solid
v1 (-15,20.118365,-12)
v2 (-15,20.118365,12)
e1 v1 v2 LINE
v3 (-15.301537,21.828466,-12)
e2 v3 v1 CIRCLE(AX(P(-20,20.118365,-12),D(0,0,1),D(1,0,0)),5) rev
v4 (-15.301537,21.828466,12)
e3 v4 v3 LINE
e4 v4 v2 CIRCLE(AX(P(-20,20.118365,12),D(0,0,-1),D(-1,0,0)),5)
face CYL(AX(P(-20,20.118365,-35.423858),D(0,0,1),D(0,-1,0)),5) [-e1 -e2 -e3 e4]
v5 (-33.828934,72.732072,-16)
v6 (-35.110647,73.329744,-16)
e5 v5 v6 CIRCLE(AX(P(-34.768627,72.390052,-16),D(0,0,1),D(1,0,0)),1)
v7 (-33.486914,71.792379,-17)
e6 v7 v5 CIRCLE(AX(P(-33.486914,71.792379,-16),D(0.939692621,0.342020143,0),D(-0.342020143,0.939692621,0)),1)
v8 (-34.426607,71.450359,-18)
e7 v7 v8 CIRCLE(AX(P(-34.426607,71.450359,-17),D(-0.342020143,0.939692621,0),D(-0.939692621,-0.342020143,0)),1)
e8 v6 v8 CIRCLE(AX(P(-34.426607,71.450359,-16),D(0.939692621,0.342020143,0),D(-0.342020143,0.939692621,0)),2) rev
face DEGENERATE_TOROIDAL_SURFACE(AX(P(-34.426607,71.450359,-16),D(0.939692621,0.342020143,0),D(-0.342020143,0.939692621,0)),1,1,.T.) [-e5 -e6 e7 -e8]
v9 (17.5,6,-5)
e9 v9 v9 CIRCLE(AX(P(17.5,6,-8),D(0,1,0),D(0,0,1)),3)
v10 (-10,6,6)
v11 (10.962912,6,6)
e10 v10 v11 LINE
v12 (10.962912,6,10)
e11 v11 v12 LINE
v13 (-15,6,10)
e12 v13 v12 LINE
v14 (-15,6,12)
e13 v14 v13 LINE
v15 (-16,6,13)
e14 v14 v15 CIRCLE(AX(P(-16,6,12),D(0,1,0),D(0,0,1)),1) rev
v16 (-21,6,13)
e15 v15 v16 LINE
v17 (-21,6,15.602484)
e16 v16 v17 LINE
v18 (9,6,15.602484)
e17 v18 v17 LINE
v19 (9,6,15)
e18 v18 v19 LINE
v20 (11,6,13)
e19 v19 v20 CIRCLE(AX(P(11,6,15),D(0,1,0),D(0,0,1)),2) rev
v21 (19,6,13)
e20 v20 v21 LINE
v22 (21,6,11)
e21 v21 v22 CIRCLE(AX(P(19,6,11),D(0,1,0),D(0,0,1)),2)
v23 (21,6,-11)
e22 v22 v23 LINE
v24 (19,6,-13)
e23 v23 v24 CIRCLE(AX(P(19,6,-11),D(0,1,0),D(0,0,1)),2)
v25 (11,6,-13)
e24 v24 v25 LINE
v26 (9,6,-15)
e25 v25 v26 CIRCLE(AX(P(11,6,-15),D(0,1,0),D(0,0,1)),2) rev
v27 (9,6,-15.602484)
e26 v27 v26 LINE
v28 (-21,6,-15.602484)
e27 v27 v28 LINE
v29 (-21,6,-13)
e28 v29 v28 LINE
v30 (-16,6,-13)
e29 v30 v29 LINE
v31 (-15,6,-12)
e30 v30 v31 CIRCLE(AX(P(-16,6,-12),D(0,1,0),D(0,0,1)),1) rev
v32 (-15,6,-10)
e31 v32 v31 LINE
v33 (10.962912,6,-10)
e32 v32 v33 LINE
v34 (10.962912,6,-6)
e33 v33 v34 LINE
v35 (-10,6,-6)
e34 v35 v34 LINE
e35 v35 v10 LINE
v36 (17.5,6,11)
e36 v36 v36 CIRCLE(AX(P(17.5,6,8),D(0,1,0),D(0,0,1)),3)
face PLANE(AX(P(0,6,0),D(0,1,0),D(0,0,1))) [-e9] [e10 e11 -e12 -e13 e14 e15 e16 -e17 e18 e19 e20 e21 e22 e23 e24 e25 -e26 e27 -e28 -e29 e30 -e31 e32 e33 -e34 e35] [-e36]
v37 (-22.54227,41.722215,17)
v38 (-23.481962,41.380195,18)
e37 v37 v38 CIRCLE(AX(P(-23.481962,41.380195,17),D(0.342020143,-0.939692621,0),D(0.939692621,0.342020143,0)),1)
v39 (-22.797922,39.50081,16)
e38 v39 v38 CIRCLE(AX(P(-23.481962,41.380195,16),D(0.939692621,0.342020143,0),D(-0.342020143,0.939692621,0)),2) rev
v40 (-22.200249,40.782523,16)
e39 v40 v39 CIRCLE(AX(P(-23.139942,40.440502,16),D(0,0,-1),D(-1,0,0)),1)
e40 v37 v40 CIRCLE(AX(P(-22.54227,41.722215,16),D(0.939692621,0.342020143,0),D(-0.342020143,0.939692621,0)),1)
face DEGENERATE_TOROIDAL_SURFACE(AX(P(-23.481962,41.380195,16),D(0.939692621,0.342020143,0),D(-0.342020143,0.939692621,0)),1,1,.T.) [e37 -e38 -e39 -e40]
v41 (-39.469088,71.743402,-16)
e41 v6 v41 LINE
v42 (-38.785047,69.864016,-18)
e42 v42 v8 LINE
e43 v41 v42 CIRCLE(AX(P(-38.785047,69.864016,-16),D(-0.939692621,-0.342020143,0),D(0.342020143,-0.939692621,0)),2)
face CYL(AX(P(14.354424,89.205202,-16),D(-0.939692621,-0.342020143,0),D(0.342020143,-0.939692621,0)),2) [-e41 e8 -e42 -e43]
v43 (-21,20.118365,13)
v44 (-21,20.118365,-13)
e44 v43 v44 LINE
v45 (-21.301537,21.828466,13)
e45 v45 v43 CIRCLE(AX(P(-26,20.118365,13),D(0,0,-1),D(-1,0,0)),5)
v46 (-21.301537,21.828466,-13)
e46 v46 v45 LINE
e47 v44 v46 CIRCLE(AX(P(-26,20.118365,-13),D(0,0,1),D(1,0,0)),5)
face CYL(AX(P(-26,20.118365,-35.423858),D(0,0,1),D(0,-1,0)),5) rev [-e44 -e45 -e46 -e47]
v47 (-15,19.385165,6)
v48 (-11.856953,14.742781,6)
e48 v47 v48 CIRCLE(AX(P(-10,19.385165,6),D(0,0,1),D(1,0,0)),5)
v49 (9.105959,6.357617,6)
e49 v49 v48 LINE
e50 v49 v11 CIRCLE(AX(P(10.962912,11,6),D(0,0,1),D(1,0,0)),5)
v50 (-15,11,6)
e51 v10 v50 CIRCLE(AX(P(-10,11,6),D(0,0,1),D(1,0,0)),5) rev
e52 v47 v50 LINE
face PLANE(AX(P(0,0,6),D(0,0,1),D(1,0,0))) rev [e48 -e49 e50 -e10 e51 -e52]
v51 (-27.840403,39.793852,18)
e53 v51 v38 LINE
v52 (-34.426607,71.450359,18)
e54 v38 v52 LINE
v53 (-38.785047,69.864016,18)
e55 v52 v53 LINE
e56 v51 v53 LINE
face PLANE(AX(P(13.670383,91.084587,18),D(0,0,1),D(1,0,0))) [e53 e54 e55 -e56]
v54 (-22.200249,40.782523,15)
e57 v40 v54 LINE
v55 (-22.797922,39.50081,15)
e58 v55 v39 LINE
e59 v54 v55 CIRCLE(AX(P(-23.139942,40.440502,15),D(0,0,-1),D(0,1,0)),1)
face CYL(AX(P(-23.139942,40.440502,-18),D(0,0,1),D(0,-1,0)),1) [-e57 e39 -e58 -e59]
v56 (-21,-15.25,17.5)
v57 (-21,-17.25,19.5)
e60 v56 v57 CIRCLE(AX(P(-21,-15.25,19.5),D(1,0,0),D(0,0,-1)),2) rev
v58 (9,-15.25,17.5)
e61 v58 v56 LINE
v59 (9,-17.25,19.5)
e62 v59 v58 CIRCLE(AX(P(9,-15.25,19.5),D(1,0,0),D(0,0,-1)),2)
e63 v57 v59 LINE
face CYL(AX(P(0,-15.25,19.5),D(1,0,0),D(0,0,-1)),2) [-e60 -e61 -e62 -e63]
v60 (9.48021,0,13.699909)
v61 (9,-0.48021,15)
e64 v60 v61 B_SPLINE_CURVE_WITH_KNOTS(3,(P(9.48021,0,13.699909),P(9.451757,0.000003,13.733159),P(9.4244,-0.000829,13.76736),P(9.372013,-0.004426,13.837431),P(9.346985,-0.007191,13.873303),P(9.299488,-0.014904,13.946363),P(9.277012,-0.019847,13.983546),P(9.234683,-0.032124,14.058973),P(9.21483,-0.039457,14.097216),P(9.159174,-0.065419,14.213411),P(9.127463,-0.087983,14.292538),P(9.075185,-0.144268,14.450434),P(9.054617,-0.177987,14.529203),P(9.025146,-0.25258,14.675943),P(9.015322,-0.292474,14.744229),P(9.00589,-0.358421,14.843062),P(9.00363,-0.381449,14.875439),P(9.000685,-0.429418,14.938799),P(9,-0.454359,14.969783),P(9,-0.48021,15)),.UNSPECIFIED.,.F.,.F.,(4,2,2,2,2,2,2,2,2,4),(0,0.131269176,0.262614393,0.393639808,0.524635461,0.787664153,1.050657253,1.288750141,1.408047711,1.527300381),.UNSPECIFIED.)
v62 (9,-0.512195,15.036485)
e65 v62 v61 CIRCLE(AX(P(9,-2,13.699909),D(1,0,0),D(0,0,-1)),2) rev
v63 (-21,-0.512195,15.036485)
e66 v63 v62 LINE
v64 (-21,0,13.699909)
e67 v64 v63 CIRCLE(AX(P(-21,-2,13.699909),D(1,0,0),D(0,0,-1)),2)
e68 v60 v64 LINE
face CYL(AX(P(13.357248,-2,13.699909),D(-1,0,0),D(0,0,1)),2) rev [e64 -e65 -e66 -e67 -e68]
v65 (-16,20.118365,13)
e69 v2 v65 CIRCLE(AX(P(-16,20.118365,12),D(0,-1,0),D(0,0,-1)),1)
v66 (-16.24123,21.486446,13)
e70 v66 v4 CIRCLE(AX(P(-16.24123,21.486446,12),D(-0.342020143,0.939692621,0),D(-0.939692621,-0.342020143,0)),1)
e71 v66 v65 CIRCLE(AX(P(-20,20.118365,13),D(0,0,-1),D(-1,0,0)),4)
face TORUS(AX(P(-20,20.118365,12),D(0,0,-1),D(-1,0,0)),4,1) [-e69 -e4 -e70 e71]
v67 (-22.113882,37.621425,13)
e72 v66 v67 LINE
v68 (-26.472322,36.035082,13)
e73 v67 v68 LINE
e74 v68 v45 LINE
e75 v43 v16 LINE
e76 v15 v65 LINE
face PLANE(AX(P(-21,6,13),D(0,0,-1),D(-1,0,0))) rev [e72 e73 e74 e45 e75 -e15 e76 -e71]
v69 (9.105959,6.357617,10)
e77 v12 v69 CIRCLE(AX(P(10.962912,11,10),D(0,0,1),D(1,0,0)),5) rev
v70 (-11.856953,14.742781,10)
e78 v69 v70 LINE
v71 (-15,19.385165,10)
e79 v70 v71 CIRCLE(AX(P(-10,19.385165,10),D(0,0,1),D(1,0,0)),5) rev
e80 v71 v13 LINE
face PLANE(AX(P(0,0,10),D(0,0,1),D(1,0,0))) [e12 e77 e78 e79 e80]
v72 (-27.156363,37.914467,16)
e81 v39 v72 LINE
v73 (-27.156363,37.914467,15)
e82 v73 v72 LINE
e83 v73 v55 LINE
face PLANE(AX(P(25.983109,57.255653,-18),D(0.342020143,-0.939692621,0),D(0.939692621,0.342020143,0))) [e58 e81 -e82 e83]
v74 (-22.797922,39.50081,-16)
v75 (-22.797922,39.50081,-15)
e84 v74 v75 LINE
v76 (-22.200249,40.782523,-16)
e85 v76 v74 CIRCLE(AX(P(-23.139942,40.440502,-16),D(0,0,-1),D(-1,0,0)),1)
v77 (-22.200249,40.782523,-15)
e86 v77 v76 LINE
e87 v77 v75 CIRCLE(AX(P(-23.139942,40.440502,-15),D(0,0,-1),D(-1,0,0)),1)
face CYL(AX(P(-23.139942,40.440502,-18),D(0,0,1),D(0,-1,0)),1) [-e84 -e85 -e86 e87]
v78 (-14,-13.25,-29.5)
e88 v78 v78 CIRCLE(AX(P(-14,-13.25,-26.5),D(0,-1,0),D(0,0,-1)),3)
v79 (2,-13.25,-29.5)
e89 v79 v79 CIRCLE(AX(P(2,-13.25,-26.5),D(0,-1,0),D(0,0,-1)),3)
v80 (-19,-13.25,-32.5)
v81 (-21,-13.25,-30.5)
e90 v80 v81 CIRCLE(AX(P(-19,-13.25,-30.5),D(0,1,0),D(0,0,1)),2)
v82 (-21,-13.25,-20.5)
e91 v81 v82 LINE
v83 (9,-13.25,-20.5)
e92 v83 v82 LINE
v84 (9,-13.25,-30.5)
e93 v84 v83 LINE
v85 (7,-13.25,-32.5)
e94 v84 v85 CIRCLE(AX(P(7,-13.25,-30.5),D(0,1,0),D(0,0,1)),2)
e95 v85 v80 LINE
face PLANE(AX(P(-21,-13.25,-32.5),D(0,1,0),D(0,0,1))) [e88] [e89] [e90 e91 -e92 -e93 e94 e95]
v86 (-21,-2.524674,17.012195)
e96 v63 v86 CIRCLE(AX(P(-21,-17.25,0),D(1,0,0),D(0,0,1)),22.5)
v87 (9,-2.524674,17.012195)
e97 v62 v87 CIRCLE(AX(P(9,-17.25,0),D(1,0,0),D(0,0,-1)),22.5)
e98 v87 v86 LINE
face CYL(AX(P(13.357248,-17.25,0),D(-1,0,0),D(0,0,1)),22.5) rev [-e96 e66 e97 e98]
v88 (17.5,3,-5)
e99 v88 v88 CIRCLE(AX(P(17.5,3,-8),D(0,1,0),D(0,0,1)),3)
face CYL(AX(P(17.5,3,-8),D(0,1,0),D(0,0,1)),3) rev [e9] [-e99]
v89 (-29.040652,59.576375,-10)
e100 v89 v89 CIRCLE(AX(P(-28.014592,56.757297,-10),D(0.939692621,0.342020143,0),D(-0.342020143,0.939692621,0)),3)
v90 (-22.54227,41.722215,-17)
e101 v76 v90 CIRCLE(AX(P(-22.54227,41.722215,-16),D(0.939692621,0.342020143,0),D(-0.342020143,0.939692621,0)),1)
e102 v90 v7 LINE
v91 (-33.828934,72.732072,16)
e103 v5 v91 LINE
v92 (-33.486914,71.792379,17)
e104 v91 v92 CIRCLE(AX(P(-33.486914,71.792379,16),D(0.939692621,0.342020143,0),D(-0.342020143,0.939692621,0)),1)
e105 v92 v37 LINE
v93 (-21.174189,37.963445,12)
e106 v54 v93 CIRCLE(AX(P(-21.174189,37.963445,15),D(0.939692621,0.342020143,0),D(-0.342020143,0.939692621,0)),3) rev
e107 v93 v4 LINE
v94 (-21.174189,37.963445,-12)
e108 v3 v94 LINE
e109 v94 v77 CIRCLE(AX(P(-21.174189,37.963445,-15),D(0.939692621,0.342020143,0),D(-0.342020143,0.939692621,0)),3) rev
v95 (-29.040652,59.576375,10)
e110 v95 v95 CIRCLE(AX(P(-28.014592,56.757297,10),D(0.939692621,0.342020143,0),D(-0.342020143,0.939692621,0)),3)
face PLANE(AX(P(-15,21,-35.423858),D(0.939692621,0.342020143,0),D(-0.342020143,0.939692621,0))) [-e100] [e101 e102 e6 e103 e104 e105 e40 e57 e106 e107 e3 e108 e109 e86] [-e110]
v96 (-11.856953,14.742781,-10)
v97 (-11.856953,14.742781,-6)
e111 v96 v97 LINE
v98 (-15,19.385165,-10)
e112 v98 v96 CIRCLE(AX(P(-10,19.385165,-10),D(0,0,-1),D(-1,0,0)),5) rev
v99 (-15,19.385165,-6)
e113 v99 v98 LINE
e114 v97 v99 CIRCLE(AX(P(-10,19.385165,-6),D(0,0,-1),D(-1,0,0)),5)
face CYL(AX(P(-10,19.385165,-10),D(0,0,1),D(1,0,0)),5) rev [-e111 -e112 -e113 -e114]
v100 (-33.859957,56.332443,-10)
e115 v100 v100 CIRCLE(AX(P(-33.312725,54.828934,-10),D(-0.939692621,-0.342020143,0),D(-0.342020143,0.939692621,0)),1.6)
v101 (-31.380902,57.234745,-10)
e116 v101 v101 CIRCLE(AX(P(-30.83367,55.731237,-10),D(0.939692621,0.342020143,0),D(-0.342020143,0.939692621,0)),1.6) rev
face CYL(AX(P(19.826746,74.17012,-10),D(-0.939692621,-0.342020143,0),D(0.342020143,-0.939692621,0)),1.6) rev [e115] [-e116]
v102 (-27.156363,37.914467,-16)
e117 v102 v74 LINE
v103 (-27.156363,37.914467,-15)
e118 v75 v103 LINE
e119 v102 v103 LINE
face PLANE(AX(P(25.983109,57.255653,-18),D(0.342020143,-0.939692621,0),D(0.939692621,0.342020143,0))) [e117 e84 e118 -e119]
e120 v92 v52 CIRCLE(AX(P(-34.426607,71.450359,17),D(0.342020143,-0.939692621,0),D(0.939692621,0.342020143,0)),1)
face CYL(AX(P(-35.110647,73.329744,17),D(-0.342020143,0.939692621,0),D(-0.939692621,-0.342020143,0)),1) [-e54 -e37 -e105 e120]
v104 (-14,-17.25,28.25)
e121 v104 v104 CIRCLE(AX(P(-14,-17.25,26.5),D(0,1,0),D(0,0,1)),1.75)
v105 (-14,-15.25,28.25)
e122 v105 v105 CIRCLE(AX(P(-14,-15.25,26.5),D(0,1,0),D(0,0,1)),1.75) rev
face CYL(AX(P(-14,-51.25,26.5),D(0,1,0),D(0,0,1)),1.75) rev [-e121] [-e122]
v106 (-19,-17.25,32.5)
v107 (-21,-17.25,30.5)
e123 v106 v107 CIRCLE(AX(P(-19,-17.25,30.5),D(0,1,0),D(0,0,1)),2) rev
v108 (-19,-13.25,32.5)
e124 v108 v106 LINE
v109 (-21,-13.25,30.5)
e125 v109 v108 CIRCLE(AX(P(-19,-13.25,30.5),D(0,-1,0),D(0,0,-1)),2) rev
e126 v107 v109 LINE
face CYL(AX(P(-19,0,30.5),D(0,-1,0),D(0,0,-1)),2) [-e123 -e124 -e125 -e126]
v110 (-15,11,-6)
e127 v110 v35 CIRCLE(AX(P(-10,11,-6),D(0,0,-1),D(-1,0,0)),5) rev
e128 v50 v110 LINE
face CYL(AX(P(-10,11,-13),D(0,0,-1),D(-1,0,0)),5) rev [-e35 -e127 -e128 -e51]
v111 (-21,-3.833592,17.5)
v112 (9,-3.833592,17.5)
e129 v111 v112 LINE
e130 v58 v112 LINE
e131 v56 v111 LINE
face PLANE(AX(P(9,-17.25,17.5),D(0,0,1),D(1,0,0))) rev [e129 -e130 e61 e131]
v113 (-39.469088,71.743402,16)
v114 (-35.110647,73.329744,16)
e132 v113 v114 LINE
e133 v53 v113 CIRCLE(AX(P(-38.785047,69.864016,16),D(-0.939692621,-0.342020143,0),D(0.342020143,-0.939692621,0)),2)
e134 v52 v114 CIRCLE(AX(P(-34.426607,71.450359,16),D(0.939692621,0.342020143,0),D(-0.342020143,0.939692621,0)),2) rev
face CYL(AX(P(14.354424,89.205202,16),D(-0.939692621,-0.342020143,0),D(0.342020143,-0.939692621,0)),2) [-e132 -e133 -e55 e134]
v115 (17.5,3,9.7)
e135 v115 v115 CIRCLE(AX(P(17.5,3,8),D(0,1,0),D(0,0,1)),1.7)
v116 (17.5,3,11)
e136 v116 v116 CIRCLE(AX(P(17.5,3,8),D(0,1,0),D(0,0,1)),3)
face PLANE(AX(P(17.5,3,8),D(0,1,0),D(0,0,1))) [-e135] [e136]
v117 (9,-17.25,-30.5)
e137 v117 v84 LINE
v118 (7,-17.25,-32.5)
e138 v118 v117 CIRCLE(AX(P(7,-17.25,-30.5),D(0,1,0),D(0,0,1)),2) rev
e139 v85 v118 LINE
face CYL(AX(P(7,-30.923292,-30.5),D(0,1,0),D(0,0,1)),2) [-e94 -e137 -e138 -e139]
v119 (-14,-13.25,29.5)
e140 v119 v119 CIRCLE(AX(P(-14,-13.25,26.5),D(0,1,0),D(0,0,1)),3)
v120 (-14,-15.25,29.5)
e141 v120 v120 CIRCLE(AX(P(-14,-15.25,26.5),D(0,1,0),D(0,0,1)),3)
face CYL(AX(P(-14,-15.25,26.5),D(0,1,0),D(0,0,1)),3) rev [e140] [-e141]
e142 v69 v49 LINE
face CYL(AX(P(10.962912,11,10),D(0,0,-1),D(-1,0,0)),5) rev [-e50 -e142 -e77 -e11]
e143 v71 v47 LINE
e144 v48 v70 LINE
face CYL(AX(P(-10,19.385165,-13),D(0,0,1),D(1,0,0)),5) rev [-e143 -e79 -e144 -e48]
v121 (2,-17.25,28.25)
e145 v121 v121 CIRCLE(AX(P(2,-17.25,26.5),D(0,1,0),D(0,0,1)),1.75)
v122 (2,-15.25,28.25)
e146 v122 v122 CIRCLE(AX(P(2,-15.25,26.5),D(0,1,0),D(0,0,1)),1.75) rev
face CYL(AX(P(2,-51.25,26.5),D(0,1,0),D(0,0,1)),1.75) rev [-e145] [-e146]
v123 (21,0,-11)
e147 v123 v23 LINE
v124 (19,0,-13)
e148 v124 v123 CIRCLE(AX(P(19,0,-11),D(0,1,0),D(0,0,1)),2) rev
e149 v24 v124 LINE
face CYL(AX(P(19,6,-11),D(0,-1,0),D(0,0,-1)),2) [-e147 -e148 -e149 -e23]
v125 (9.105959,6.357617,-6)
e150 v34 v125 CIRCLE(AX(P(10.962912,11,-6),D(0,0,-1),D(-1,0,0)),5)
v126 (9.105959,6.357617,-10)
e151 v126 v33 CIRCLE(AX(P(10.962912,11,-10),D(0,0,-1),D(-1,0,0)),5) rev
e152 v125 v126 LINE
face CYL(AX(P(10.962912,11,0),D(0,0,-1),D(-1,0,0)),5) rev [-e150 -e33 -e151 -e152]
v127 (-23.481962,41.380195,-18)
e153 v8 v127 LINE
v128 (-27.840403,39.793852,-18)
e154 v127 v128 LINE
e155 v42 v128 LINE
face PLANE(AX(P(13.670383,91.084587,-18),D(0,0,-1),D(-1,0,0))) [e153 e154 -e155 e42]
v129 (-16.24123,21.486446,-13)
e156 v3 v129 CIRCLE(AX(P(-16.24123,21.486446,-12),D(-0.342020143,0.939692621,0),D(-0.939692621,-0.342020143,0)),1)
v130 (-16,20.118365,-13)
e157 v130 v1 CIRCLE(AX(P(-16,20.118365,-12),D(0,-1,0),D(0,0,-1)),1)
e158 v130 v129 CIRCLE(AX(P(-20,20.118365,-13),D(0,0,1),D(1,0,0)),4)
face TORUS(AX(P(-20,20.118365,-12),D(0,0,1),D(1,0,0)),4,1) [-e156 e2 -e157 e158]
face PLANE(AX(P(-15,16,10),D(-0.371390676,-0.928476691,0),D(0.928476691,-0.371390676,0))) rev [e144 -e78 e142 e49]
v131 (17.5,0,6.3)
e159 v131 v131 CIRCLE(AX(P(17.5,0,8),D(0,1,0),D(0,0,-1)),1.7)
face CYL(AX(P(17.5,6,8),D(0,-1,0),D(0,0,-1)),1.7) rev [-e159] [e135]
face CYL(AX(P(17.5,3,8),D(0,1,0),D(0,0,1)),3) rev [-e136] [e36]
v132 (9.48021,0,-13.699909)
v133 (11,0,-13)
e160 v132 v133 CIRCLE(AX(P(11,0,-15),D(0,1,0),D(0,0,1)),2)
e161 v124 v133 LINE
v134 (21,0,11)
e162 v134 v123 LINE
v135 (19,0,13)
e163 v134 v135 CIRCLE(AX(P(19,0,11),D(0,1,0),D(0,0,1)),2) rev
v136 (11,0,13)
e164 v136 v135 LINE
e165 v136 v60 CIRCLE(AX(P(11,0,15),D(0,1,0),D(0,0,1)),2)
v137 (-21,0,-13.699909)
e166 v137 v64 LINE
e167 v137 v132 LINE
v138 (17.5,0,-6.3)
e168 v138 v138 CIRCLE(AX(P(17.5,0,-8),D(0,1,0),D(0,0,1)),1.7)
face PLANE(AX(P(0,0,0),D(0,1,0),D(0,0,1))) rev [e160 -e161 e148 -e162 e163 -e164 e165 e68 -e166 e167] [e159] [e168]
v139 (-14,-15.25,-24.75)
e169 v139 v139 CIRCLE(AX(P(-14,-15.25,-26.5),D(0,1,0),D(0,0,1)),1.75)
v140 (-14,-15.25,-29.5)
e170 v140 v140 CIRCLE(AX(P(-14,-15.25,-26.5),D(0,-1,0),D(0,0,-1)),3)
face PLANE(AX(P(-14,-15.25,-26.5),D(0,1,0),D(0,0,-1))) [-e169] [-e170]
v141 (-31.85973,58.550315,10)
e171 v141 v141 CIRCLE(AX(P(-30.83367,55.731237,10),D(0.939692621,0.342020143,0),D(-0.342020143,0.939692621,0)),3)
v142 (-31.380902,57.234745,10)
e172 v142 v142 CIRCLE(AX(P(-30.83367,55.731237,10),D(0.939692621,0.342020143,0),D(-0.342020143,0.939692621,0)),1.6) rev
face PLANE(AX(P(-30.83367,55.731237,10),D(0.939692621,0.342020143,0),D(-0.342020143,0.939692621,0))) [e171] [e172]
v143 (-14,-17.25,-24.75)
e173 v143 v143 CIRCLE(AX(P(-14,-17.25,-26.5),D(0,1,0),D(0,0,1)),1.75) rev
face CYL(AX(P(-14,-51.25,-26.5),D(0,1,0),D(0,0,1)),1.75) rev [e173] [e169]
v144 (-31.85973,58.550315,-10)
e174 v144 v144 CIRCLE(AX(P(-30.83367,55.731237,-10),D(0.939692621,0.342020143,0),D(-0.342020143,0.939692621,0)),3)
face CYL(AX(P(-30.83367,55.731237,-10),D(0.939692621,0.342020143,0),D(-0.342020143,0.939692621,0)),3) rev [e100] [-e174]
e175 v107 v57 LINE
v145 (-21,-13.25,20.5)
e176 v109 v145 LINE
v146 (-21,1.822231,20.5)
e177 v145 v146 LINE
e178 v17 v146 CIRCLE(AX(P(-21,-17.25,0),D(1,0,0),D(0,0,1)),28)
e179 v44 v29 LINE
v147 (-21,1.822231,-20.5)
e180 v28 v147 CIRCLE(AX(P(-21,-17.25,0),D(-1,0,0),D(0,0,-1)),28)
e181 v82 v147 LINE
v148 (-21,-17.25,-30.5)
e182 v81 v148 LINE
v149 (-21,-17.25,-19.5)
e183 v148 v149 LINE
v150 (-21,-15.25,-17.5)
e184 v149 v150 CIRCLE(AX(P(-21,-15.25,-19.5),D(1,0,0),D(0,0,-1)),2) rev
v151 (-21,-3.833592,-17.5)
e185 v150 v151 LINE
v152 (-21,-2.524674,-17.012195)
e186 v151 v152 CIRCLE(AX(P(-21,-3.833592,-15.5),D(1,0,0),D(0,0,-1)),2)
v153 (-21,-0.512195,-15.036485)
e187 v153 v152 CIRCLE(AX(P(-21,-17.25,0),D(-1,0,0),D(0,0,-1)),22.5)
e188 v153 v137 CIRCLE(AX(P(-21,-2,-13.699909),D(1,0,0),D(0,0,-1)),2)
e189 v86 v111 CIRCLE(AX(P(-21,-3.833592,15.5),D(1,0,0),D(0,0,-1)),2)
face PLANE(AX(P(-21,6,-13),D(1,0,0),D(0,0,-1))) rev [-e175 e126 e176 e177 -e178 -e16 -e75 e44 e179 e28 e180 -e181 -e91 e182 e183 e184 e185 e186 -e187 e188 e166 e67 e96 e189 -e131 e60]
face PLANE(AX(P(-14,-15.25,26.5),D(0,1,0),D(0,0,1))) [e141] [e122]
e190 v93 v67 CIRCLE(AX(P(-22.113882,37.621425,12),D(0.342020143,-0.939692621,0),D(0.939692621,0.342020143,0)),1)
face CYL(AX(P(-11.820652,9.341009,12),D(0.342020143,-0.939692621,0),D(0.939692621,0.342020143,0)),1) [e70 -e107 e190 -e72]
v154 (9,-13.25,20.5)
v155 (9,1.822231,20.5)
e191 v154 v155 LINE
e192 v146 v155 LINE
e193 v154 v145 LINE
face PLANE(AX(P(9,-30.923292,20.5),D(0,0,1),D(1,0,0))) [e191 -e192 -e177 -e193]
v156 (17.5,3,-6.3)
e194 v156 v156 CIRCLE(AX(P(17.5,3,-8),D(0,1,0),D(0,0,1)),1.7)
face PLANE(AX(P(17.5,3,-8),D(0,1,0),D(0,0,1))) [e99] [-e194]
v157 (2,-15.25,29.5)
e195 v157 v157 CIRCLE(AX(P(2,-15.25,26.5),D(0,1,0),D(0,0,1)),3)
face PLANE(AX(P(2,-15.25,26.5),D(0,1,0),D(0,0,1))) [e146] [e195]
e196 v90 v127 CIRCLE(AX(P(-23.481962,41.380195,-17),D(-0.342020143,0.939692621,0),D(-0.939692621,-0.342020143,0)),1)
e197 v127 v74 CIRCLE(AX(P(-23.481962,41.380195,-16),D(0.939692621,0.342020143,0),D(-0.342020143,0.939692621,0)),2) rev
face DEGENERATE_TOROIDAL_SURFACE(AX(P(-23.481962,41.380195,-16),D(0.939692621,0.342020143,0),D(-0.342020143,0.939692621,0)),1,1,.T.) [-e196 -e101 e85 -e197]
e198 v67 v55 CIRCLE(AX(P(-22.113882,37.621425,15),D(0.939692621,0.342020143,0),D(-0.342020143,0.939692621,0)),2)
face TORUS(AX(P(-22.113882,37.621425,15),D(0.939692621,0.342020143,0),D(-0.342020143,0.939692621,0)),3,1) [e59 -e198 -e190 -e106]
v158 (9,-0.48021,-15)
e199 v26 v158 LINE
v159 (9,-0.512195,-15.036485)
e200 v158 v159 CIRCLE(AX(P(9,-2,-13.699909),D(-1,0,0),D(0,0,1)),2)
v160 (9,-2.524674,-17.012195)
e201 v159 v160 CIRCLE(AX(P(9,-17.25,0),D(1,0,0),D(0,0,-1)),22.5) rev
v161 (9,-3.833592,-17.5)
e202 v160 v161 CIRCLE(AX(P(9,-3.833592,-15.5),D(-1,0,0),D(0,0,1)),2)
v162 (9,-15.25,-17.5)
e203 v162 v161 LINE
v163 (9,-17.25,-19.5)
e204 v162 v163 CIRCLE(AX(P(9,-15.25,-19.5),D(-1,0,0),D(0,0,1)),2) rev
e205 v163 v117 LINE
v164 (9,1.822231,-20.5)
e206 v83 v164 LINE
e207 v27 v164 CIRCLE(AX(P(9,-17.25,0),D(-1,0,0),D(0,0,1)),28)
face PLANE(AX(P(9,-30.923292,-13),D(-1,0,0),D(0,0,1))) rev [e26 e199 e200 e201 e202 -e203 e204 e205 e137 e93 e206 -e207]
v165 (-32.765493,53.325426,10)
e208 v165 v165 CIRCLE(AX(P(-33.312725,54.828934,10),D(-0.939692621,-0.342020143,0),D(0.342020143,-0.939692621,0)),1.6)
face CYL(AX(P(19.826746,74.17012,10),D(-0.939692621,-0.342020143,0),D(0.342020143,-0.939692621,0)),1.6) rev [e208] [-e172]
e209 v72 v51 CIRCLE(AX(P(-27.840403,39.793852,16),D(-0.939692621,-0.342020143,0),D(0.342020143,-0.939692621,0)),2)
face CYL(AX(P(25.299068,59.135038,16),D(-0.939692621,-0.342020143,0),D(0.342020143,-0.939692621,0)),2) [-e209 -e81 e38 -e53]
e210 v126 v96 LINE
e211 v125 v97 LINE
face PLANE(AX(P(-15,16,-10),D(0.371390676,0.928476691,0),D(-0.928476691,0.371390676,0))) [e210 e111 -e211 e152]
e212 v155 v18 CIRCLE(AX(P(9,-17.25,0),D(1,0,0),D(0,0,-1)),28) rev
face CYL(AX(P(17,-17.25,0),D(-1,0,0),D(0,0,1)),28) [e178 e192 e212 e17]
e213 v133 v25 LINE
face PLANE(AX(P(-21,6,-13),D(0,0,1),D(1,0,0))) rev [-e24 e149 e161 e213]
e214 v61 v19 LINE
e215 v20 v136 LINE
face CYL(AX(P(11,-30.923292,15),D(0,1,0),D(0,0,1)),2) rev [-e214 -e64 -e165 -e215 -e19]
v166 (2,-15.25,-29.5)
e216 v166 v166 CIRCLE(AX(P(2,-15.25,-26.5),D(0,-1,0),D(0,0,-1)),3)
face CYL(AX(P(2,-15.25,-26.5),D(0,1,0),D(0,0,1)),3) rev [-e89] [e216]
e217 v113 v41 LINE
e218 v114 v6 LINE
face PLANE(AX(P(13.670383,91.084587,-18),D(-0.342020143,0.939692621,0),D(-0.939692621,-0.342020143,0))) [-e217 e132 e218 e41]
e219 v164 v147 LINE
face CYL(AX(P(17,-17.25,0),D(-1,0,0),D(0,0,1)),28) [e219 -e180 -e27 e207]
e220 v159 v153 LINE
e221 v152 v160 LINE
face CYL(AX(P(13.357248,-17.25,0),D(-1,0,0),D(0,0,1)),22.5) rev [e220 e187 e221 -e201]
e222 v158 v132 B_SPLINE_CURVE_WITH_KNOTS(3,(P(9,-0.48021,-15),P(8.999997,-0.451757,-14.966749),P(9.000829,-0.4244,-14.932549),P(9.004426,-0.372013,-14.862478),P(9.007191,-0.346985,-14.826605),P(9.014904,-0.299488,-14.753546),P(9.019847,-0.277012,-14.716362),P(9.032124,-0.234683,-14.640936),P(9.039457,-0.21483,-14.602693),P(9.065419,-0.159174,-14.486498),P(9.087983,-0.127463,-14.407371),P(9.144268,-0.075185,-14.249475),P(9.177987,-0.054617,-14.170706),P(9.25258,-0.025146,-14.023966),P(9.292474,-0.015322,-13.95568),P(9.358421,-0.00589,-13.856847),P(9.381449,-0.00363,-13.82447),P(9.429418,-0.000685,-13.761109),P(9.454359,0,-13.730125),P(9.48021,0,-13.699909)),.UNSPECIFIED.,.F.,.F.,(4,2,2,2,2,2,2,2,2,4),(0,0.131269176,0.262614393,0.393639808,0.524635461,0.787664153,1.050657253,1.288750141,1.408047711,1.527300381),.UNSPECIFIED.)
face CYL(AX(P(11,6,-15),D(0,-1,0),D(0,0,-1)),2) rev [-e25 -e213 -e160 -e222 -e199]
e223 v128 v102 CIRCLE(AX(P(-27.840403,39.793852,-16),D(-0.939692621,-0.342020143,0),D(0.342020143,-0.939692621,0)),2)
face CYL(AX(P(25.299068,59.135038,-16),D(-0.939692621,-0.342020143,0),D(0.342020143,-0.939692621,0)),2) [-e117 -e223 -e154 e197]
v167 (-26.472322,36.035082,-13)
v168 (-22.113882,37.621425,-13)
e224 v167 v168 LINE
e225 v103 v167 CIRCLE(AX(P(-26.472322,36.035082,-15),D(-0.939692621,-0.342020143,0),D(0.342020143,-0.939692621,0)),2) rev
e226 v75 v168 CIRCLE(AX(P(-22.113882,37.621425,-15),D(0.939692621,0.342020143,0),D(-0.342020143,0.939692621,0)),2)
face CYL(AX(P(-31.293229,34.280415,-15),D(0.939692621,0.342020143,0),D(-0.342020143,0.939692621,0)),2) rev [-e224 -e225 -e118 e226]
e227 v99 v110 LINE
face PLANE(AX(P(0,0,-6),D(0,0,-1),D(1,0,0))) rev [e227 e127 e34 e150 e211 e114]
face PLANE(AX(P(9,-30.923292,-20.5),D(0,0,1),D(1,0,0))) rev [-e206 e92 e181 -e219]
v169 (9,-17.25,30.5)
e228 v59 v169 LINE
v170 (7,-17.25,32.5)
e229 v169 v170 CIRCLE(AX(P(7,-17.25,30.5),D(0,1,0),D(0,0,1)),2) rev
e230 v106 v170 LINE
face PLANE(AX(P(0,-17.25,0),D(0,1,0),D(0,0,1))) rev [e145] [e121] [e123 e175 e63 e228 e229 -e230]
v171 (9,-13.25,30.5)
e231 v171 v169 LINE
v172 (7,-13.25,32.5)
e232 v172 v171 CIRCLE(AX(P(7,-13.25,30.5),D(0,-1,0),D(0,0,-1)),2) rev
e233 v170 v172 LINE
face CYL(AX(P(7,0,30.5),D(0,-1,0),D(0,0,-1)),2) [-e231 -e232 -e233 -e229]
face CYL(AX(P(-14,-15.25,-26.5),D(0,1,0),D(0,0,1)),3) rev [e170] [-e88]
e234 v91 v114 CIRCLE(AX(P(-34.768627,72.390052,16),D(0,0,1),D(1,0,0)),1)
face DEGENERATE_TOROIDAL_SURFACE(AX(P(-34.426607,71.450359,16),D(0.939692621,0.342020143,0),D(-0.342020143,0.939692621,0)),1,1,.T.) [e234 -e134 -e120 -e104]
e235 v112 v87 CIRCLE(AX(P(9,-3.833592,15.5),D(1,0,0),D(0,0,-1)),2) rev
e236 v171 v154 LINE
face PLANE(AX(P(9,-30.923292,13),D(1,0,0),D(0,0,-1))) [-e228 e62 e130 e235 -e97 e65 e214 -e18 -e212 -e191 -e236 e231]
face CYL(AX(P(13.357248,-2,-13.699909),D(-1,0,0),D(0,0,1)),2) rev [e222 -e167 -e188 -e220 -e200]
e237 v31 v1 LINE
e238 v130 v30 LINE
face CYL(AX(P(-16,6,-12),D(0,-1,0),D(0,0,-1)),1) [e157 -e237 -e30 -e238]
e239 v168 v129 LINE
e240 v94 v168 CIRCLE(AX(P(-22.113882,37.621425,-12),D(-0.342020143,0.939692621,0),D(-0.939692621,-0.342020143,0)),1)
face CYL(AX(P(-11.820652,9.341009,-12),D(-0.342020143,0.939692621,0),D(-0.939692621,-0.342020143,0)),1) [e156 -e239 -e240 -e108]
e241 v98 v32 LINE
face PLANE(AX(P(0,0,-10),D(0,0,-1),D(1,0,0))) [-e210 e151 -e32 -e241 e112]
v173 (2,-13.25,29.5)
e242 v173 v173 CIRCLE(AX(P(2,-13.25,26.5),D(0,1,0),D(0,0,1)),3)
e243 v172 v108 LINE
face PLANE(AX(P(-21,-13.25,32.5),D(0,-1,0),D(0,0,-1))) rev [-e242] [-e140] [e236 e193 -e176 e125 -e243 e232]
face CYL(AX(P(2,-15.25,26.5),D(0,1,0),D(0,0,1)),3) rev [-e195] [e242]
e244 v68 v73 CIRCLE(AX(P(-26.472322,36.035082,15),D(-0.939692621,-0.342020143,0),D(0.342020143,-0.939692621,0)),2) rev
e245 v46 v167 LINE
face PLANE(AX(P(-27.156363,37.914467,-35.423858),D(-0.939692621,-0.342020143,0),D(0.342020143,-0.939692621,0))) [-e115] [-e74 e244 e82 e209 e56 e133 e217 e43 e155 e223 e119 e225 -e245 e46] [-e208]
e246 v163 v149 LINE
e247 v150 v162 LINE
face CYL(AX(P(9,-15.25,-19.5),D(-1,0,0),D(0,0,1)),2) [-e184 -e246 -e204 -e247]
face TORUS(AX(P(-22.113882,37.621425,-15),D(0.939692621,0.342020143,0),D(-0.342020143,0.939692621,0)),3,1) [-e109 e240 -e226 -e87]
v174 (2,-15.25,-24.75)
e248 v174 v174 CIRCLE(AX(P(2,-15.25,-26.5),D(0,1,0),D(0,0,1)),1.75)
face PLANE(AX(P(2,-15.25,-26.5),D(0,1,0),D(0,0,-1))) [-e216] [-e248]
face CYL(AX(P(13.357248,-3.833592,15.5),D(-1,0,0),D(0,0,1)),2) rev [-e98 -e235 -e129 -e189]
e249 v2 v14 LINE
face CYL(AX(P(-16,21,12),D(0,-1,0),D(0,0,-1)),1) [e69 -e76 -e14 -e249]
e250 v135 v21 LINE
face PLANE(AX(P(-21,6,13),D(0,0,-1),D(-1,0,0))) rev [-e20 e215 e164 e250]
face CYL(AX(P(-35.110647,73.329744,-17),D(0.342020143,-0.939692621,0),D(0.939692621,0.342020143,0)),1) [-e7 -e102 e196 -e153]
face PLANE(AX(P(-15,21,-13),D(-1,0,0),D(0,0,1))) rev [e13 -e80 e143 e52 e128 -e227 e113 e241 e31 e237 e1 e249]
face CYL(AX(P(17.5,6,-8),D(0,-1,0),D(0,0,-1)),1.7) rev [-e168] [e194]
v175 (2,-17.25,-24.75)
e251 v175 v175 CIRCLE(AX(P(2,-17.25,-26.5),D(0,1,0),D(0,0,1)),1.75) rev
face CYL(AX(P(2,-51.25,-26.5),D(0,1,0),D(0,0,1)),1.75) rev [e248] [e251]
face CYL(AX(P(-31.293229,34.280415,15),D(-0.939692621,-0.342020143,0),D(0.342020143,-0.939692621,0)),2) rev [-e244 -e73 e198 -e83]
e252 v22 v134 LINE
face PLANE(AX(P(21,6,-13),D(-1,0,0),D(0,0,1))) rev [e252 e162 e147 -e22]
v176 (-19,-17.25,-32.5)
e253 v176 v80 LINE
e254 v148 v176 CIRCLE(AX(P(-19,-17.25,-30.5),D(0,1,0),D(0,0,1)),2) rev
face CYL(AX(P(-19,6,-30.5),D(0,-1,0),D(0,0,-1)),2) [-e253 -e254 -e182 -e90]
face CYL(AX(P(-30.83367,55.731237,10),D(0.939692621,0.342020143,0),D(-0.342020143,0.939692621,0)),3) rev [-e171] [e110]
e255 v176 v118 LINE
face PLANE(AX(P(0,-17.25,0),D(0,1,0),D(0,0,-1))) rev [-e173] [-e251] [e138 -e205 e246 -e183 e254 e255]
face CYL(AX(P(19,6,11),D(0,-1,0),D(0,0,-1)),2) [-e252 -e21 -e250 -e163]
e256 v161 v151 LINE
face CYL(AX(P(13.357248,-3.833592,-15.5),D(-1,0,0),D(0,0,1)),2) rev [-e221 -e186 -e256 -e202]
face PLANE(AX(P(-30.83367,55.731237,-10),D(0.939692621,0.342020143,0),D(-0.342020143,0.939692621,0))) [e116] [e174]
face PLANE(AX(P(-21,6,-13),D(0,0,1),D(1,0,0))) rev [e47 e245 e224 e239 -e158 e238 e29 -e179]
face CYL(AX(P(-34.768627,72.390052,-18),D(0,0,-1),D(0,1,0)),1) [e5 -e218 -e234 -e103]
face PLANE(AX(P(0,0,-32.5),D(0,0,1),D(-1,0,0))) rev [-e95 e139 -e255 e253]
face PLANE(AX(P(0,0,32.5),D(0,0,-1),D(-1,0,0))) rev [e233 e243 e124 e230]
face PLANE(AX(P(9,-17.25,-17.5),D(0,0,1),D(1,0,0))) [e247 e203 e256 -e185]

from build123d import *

# Parameters (mm, degrees)
SKETCH_1_W              = 42
SKETCH_1_H              = 26
SKETCH_1_R              = 1.7
EXTRUDE_1_DEPTH         = 6
SKETCH_15_W             = 6
SKETCH_15_H             = 26
EXTRUDE_4_DEPTH         = 15
EXTRUDE_5_DEPTH         = 26
SKETCH_17_W             = 36
SKETCH_17_H             = 36
SKETCH_17_R             = 1.6
EXTRUDE_6_DEPTH         = 5.638155725
FILLET_3_R              = 2
SKETCH_18_R             = 3
CUT_EXTRUDE_4_DEPTH     = 3
SKETCH_19_R             = 3
CUT_EXTRUDE_5_DEPTH     = 3
FILLET_4_R              = 1
FILLET_6_R              = 5
EXTRUDE_7_DEPTH         = 2
FILLET_7_R              = 5
FILLET_8_R              = 5
SKETCH_21_W             = 30
SKETCH_21_H             = 7.5
EXTRUDE_8_DEPTH         = 6
SKETCH_23_W             = 30
SKETCH_23_H             = 3
EXTRUDE_9_DEPTH         = 17.25
SKETCH_24_W             = 30
SKETCH_24_H             = 4
EXTRUDE_10_DEPTH        = 12
EXTRUDE_11_DEPTH        = 30
FILLET_9_R              = 2
CUT_EXTRUDE_6_DEPTH     = 38
FILLET_11_R             = 2
SKETCH_29_R             = 1.75
CUT_EXTRUDE_7_DEPTH     = 38
SKETCH_30_R             = 3
CUT_EXTRUDE_8_DEPTH     = 2
FILLET_9_OF_MIRROR_2_R  = 2
FILLET_11_OF_MIRROR_2_R = 2
FILLET_14_R             = 2


with BuildPart() as part:
    # 草图1 → 凸台-拉伸1 (new body)
    with BuildSketch(Plane(origin=(0, 0, 0), x_dir=(1, 0, 0), z_dir=(0, 1, 0))):
        Rectangle(SKETCH_1_W, SKETCH_1_H)
        with Locations(Location((17.5, 8, 0), (0, 0, 270))):
            Circle(SKETCH_1_R, mode=Mode.SUBTRACT)
        with Locations(Location((17.5, -8, 0), (0, 0, 90))):
            Circle(SKETCH_1_R, mode=Mode.SUBTRACT)
    extrude(amount=EXTRUDE_1_DEPTH)

    # 草图15 → 凸台-拉伸4 (add)
    with BuildSketch(Plane(origin=(0, 6, 0), x_dir=(1, 0, 0), z_dir=(0, 1, 0))):
        with Locations((-18, 0)):
            Rectangle(SKETCH_15_W, SKETCH_15_H)
    extrude(amount=EXTRUDE_4_DEPTH)

    # 草图16 → 凸台-拉伸5 (add)
    with BuildSketch(Plane.XY.offset(13)):
        Polygon((-15, 21), (-21.858229251, 39.842830003), (-27.15636258, 37.914467174), (-21, 21), align=None)
    extrude(amount=-EXTRUDE_5_DEPTH)

    # 草图17 → 凸台-拉伸6 (add)
    with BuildSketch(Plane(origin=(-11.794196751, -4.292736554, 0), x_dir=(0, 0, 1), z_dir=(-0.9396926207859104, -0.3420201433256632, 0))):
        with Locations((0, 62.915968046)):
            Rectangle(SKETCH_17_W, SKETCH_17_H)
        with Locations(Location((10, 62.915968046, 0), (0, 0, 270))):
            Circle(SKETCH_17_R, mode=Mode.SUBTRACT)
        with Locations(Location((-10, 62.915968046, 0), (0, 0, 90))):
            Circle(SKETCH_17_R, mode=Mode.SUBTRACT)
    extrude(amount=-EXTRUDE_6_DEPTH)

    # 圆角3
    fillet_3_edges = [part.edges().sort_by_distance(p)[0] for p in [
        (-24.507295915, 38.878648589, 13),
        (-24.507295915, 38.878648589, -13),
        (-24.507295915, 38.878648589, 18),
        (-36.820021075, 72.707582937, 18),
        (-24.507295915, 38.878648589, -18),
        (-36.820021075, 72.707582937, -18),
    ]]
    fillet(fillet_3_edges, radius=FILLET_3_R)

    # 草图18 → 切除-拉伸4 (cut)
    with BuildSketch(Plane(origin=(-6.496063422, -2.364373725, 0), x_dir=(0, 0, -1), z_dir=(0.9396926207859105, 0.34202014332566305, 0))):
        with Locations(Location((-10, 62.915968046, 0), (0, 0, 90))):
            Circle(SKETCH_18_R)
        with Locations(Location((10, 62.915968046, 0), (0, 0, 90))):
            Circle(SKETCH_18_R)
    extrude(amount=-CUT_EXTRUDE_4_DEPTH, mode=Mode.SUBTRACT)

    # 草图19 → 切除-拉伸5 (cut)
    with BuildSketch(Plane(origin=(0, 6, 0), x_dir=(1, 0, 0), z_dir=(0, 1, 0))):
        with Locations(Location((17.5, 8, 0), (0, 0, 270))):
            Circle(SKETCH_19_R)
        with Locations(Location((17.5, -8, 0), (0, 0, 270))):
            Circle(SKETCH_19_R)
    extrude(amount=-CUT_EXTRUDE_5_DEPTH, mode=Mode.SUBTRACT)

    # 圆角4
    fillet_4_edges = [part.edges().sort_by_distance(p)[0] for p in [
        (-15, 13.5, 13),
        (-15, 13.5, -13),
        (-18.087094482, 29.481722381, 13),
        (-18.087094482, 29.481722381, -13),
        (-21.85822925, 39.842830003, -15.5),
        (-21.85822925, 39.842830003, 15.5),
        (-28.01459183, 56.757297177, 18),
        (-34.17095441, 73.671764352, 0),
        (-28.01459183, 56.757297177, -18),
        (-33.970603649, 73.121305159, -17.414213562),
        (-22.058580012, 40.393289196, -17.414213562),
        (-22.058580012, 40.393289196, 17.414213562),
        (-33.970603649, 73.121305159, 17.414213562),
        (-21.657878489, 39.292370811, -13.585786438),
        (-21.657878489, 39.292370811, 13.585786438),
    ]]
    fillet(fillet_4_edges, radius=FILLET_4_R)

    # 圆角6
    # the kernel refuses this fillet: 5 mm, written as the material it adds along each edge
    with BuildSketch(Plane(origin=(-21, 21, 13), x_dir=(0, -1, 0), z_dir=(0, 0, -1))) as fillet_6_piece_1:
        with BuildLine():
            CenterArc((FILLET_6_R * 0.176326980708, FILLET_6_R), FILLET_6_R, 250, 20)
            Line((-FILLET_6_R * 0.165693162617, FILLET_6_R * 0.0603073792141), (0, 0))
            Line((0, 0), (FILLET_6_R * 0.176326980708, 0))
        make_face()
    extrude(amount=26)
    # the kernel refuses this fillet: 5 mm, written as the material it takes off along each edge
    with BuildSketch(Plane(origin=(-20, 20.118365097, -13), x_dir=(0.9396926207859104, 0.3420201433256632, 0), z_dir=(-0.3420201433256632, 0.9396926207859104, 0))) as fillet_6_2_piece_1:
        with BuildLine():
            CenterArc((4, -1), 1, 0, 90)
            Line((5, -1), (5, 0))
            Line((5, 0), (4, 0))
        make_face()
    revolve(axis=Axis((-20, 20.118365097, -13), (0, 0, -1)), revolution_arc=20, mode=Mode.SUBTRACT)
    with BuildSketch(Plane(origin=(-20, 20.118365097, 13), x_dir=(1, 0, 0), z_dir=(0, -1, 0))) as fillet_6_2_piece_2:
        with BuildLine():
            CenterArc((4, -1), 1, 0, 90)
            Line((5, -1), (5, 0))
            Line((5, 0), (4, 0))
        make_face()
    revolve(axis=Axis((-20, 20.118365097, 13), (0, 0, 1)), revolution_arc=20, mode=Mode.SUBTRACT)
    with BuildSketch(Plane(origin=(-15, 21.000000001, -13), x_dir=(-0.34202014332566494, 0.9396926207859098, 0), z_dir=(0, 0, 1))) as fillet_6_2_piece_3:
        with BuildLine():
            CenterArc((FILLET_6_R * 0.176326980708, FILLET_6_R), FILLET_6_R, 250, 20)
            Line((-FILLET_6_R * 0.165693162617, FILLET_6_R * 0.0603073792141), (0, 0))
            Line((0, 0), (FILLET_6_R * 0.176326980708, 0))
        make_face()
    extrude(amount=26, mode=Mode.SUBTRACT)

    # 草图20 → 凸台-拉伸7 (add, symmetric)
    with BuildSketch(Plane.XY.offset(8)):
        Polygon((-15, 16), (10, 6), (-15, 6), align=None)
    extrude_7 = extrude(amount=EXTRUDE_7_DEPTH, both=True)

    # 镜向1: 凸台-拉伸7 across plane
    add(extrude_7.mirror(Plane(origin=(0, 0, 0), x_dir=(1, 0, 0), z_dir=(0, 0, -1))))

    # 圆角7
    fillet_7_edges = [part.edges().sort_by_distance(p)[0] for p in [
        (-15, 16, 8),
        (10, 6, 8),
        (-15, 16, -8),
        (10, 6, -8),
    ]]
    fillet(fillet_7_edges, radius=FILLET_7_R)

    # 圆角8
    fillet_8_edges = [part.edges().sort_by_distance(p)[0] for p in [
        (-15, 6, 0),
    ]]
    fillet(fillet_8_edges, radius=FILLET_8_R)

    # 草图21 → 凸台-拉伸8 (add)
    with BuildSketch(Plane(origin=(0, 6, 0), x_dir=(1, 0, 0), z_dir=(0, 1, 0))):
        with Locations((-6, -16.75)):
            Rectangle(SKETCH_21_W, SKETCH_21_H)
    extrude_8 = extrude(amount=-EXTRUDE_8_DEPTH)

    # 草图23 → 凸台-拉伸9 (add)
    with BuildSketch(Plane.XZ):
        with Locations((-6, 19)):
            Rectangle(SKETCH_23_W, SKETCH_23_H)
    extrude_9 = extrude(amount=EXTRUDE_9_DEPTH)

    # 草图24 → 凸台-拉伸10 (add)
    with BuildSketch(Plane.XY.offset(20.5)):
        with Locations((-6, -15.25)):
            Rectangle(SKETCH_24_W, SKETCH_24_H)
    extrude_10 = extrude(amount=EXTRUDE_10_DEPTH)

    # 草图26 → 凸台-拉伸11 (add)
    with BuildSketch(Plane.ZY.offset(21)):
        with BuildLine():
            Line((17.5, -3.107864376), (17.5, 0))
            Line((17.5, 0), (14.446020213, 0))
            ThreePointArc((14.446020213, 0), (16.048419147, -1.4798306), (17.5, -3.107864376))
        make_face()
    extrude_11 = extrude(amount=-EXTRUDE_11_DEPTH)

    # 圆角9
    fillet_9_edges = [part.edges().sort_by_distance(p)[0] for p in [
        (-6, -3.107864376, 17.5),
        (-6, 0, 14.446020213),
    ]]
    fillet(fillet_9_edges, radius=FILLET_9_R)

    # 草图28 → 切除-拉伸6 (cut)
    with BuildSketch(Plane.ZY.offset(21)):
        with BuildLine():
            Line((20.5, 1.822231123), (20.5, 6))
            Line((20.5, 6), (15.602483777, 6))
            ThreePointArc((15.602483777, 6), (18.171702504, 4.052329171), (20.5, 1.822231123))
        make_face()
    cut_extrude_6 = extrude(amount=-CUT_EXTRUDE_6_DEPTH, mode=Mode.SUBTRACT)

    # 圆角11
    fillet_11_edges = [part.edges().sort_by_distance(p)[0] for p in [
        (-6, -17.25, 17.5),
        (-21, -15.25, 32.5),
        (9, -15.25, 32.5),
    ]]
    fillet(fillet_11_edges, radius=FILLET_11_R)

    # 草图29 → 切除-拉伸7 (cut)
    with BuildSketch(Plane(origin=(0, -13.25, 0), x_dir=(1, 0, 0), z_dir=(0, 1, 0))):
        with Locations(Location((2, -26.5, 0), (0, 0, 270))):
            Circle(SKETCH_29_R)
        with Locations(Location((-14, -26.5, 0), (0, 0, 270))):
            Circle(SKETCH_29_R)
    cut_extrude_7 = extrude(amount=-CUT_EXTRUDE_7_DEPTH, mode=Mode.SUBTRACT)

    # 草图30 → 切除-拉伸8 (cut)
    with BuildSketch(Plane(origin=(0, -13.25, 0), x_dir=(1, 0, 0), z_dir=(0, 1, 0))):
        with Locations(Location((2, -26.5, 0), (0, 0, 270))):
            Circle(SKETCH_30_R)
        with Locations(Location((-14, -26.5, 0), (0, 0, 270))):
            Circle(SKETCH_30_R)
    cut_extrude_8 = extrude(amount=-CUT_EXTRUDE_8_DEPTH, mode=Mode.SUBTRACT)

    # 镜向2: 凸台-拉伸8, 凸台-拉伸9, 凸台-拉伸10, 凸台-拉伸11, 切除-拉伸6, 切除-拉伸7, 切除-拉伸8 across plane
    add(extrude_8.mirror(Plane.XY))
    add(extrude_9.mirror(Plane.XY))
    add(extrude_10.mirror(Plane.XY))
    add(extrude_11.mirror(Plane.XY))
    add(cut_extrude_6.mirror(Plane.XY), mode=Mode.SUBTRACT)
    add(cut_extrude_7.mirror(Plane.XY), mode=Mode.SUBTRACT)
    add(cut_extrude_8.mirror(Plane.XY), mode=Mode.SUBTRACT)

    # 圆角9 of 镜向2
    fillet_9_of_mirror_2_edges = [part.edges().sort_by_distance(p)[0] for p in [
        (-6, -3.107864376, -17.5),
        (-6, 0, -14.446020213),
    ]]
    fillet(fillet_9_of_mirror_2_edges, radius=FILLET_9_OF_MIRROR_2_R)

    # 圆角11 of 镜向2
    fillet_11_of_mirror_2_edges = [part.edges().sort_by_distance(p)[0] for p in [
        (-6, -17.25, -17.5),
        (-21, -15.25, -32.5),
        (9, -15.25, -32.5),
    ]]
    fillet(fillet_11_of_mirror_2_edges, radius=FILLET_11_OF_MIRROR_2_R)

    # 圆角14
    fillet_14_edges = [part.edges().sort_by_distance(p)[0] for p in [
        (9, 3, 13),
        (9, 3, -13),
        (21, 3, 13),
        (21, 3, -13),
    ]]
    fillet(fillet_14_edges, radius=FILLET_14_R)


solid = part.part
